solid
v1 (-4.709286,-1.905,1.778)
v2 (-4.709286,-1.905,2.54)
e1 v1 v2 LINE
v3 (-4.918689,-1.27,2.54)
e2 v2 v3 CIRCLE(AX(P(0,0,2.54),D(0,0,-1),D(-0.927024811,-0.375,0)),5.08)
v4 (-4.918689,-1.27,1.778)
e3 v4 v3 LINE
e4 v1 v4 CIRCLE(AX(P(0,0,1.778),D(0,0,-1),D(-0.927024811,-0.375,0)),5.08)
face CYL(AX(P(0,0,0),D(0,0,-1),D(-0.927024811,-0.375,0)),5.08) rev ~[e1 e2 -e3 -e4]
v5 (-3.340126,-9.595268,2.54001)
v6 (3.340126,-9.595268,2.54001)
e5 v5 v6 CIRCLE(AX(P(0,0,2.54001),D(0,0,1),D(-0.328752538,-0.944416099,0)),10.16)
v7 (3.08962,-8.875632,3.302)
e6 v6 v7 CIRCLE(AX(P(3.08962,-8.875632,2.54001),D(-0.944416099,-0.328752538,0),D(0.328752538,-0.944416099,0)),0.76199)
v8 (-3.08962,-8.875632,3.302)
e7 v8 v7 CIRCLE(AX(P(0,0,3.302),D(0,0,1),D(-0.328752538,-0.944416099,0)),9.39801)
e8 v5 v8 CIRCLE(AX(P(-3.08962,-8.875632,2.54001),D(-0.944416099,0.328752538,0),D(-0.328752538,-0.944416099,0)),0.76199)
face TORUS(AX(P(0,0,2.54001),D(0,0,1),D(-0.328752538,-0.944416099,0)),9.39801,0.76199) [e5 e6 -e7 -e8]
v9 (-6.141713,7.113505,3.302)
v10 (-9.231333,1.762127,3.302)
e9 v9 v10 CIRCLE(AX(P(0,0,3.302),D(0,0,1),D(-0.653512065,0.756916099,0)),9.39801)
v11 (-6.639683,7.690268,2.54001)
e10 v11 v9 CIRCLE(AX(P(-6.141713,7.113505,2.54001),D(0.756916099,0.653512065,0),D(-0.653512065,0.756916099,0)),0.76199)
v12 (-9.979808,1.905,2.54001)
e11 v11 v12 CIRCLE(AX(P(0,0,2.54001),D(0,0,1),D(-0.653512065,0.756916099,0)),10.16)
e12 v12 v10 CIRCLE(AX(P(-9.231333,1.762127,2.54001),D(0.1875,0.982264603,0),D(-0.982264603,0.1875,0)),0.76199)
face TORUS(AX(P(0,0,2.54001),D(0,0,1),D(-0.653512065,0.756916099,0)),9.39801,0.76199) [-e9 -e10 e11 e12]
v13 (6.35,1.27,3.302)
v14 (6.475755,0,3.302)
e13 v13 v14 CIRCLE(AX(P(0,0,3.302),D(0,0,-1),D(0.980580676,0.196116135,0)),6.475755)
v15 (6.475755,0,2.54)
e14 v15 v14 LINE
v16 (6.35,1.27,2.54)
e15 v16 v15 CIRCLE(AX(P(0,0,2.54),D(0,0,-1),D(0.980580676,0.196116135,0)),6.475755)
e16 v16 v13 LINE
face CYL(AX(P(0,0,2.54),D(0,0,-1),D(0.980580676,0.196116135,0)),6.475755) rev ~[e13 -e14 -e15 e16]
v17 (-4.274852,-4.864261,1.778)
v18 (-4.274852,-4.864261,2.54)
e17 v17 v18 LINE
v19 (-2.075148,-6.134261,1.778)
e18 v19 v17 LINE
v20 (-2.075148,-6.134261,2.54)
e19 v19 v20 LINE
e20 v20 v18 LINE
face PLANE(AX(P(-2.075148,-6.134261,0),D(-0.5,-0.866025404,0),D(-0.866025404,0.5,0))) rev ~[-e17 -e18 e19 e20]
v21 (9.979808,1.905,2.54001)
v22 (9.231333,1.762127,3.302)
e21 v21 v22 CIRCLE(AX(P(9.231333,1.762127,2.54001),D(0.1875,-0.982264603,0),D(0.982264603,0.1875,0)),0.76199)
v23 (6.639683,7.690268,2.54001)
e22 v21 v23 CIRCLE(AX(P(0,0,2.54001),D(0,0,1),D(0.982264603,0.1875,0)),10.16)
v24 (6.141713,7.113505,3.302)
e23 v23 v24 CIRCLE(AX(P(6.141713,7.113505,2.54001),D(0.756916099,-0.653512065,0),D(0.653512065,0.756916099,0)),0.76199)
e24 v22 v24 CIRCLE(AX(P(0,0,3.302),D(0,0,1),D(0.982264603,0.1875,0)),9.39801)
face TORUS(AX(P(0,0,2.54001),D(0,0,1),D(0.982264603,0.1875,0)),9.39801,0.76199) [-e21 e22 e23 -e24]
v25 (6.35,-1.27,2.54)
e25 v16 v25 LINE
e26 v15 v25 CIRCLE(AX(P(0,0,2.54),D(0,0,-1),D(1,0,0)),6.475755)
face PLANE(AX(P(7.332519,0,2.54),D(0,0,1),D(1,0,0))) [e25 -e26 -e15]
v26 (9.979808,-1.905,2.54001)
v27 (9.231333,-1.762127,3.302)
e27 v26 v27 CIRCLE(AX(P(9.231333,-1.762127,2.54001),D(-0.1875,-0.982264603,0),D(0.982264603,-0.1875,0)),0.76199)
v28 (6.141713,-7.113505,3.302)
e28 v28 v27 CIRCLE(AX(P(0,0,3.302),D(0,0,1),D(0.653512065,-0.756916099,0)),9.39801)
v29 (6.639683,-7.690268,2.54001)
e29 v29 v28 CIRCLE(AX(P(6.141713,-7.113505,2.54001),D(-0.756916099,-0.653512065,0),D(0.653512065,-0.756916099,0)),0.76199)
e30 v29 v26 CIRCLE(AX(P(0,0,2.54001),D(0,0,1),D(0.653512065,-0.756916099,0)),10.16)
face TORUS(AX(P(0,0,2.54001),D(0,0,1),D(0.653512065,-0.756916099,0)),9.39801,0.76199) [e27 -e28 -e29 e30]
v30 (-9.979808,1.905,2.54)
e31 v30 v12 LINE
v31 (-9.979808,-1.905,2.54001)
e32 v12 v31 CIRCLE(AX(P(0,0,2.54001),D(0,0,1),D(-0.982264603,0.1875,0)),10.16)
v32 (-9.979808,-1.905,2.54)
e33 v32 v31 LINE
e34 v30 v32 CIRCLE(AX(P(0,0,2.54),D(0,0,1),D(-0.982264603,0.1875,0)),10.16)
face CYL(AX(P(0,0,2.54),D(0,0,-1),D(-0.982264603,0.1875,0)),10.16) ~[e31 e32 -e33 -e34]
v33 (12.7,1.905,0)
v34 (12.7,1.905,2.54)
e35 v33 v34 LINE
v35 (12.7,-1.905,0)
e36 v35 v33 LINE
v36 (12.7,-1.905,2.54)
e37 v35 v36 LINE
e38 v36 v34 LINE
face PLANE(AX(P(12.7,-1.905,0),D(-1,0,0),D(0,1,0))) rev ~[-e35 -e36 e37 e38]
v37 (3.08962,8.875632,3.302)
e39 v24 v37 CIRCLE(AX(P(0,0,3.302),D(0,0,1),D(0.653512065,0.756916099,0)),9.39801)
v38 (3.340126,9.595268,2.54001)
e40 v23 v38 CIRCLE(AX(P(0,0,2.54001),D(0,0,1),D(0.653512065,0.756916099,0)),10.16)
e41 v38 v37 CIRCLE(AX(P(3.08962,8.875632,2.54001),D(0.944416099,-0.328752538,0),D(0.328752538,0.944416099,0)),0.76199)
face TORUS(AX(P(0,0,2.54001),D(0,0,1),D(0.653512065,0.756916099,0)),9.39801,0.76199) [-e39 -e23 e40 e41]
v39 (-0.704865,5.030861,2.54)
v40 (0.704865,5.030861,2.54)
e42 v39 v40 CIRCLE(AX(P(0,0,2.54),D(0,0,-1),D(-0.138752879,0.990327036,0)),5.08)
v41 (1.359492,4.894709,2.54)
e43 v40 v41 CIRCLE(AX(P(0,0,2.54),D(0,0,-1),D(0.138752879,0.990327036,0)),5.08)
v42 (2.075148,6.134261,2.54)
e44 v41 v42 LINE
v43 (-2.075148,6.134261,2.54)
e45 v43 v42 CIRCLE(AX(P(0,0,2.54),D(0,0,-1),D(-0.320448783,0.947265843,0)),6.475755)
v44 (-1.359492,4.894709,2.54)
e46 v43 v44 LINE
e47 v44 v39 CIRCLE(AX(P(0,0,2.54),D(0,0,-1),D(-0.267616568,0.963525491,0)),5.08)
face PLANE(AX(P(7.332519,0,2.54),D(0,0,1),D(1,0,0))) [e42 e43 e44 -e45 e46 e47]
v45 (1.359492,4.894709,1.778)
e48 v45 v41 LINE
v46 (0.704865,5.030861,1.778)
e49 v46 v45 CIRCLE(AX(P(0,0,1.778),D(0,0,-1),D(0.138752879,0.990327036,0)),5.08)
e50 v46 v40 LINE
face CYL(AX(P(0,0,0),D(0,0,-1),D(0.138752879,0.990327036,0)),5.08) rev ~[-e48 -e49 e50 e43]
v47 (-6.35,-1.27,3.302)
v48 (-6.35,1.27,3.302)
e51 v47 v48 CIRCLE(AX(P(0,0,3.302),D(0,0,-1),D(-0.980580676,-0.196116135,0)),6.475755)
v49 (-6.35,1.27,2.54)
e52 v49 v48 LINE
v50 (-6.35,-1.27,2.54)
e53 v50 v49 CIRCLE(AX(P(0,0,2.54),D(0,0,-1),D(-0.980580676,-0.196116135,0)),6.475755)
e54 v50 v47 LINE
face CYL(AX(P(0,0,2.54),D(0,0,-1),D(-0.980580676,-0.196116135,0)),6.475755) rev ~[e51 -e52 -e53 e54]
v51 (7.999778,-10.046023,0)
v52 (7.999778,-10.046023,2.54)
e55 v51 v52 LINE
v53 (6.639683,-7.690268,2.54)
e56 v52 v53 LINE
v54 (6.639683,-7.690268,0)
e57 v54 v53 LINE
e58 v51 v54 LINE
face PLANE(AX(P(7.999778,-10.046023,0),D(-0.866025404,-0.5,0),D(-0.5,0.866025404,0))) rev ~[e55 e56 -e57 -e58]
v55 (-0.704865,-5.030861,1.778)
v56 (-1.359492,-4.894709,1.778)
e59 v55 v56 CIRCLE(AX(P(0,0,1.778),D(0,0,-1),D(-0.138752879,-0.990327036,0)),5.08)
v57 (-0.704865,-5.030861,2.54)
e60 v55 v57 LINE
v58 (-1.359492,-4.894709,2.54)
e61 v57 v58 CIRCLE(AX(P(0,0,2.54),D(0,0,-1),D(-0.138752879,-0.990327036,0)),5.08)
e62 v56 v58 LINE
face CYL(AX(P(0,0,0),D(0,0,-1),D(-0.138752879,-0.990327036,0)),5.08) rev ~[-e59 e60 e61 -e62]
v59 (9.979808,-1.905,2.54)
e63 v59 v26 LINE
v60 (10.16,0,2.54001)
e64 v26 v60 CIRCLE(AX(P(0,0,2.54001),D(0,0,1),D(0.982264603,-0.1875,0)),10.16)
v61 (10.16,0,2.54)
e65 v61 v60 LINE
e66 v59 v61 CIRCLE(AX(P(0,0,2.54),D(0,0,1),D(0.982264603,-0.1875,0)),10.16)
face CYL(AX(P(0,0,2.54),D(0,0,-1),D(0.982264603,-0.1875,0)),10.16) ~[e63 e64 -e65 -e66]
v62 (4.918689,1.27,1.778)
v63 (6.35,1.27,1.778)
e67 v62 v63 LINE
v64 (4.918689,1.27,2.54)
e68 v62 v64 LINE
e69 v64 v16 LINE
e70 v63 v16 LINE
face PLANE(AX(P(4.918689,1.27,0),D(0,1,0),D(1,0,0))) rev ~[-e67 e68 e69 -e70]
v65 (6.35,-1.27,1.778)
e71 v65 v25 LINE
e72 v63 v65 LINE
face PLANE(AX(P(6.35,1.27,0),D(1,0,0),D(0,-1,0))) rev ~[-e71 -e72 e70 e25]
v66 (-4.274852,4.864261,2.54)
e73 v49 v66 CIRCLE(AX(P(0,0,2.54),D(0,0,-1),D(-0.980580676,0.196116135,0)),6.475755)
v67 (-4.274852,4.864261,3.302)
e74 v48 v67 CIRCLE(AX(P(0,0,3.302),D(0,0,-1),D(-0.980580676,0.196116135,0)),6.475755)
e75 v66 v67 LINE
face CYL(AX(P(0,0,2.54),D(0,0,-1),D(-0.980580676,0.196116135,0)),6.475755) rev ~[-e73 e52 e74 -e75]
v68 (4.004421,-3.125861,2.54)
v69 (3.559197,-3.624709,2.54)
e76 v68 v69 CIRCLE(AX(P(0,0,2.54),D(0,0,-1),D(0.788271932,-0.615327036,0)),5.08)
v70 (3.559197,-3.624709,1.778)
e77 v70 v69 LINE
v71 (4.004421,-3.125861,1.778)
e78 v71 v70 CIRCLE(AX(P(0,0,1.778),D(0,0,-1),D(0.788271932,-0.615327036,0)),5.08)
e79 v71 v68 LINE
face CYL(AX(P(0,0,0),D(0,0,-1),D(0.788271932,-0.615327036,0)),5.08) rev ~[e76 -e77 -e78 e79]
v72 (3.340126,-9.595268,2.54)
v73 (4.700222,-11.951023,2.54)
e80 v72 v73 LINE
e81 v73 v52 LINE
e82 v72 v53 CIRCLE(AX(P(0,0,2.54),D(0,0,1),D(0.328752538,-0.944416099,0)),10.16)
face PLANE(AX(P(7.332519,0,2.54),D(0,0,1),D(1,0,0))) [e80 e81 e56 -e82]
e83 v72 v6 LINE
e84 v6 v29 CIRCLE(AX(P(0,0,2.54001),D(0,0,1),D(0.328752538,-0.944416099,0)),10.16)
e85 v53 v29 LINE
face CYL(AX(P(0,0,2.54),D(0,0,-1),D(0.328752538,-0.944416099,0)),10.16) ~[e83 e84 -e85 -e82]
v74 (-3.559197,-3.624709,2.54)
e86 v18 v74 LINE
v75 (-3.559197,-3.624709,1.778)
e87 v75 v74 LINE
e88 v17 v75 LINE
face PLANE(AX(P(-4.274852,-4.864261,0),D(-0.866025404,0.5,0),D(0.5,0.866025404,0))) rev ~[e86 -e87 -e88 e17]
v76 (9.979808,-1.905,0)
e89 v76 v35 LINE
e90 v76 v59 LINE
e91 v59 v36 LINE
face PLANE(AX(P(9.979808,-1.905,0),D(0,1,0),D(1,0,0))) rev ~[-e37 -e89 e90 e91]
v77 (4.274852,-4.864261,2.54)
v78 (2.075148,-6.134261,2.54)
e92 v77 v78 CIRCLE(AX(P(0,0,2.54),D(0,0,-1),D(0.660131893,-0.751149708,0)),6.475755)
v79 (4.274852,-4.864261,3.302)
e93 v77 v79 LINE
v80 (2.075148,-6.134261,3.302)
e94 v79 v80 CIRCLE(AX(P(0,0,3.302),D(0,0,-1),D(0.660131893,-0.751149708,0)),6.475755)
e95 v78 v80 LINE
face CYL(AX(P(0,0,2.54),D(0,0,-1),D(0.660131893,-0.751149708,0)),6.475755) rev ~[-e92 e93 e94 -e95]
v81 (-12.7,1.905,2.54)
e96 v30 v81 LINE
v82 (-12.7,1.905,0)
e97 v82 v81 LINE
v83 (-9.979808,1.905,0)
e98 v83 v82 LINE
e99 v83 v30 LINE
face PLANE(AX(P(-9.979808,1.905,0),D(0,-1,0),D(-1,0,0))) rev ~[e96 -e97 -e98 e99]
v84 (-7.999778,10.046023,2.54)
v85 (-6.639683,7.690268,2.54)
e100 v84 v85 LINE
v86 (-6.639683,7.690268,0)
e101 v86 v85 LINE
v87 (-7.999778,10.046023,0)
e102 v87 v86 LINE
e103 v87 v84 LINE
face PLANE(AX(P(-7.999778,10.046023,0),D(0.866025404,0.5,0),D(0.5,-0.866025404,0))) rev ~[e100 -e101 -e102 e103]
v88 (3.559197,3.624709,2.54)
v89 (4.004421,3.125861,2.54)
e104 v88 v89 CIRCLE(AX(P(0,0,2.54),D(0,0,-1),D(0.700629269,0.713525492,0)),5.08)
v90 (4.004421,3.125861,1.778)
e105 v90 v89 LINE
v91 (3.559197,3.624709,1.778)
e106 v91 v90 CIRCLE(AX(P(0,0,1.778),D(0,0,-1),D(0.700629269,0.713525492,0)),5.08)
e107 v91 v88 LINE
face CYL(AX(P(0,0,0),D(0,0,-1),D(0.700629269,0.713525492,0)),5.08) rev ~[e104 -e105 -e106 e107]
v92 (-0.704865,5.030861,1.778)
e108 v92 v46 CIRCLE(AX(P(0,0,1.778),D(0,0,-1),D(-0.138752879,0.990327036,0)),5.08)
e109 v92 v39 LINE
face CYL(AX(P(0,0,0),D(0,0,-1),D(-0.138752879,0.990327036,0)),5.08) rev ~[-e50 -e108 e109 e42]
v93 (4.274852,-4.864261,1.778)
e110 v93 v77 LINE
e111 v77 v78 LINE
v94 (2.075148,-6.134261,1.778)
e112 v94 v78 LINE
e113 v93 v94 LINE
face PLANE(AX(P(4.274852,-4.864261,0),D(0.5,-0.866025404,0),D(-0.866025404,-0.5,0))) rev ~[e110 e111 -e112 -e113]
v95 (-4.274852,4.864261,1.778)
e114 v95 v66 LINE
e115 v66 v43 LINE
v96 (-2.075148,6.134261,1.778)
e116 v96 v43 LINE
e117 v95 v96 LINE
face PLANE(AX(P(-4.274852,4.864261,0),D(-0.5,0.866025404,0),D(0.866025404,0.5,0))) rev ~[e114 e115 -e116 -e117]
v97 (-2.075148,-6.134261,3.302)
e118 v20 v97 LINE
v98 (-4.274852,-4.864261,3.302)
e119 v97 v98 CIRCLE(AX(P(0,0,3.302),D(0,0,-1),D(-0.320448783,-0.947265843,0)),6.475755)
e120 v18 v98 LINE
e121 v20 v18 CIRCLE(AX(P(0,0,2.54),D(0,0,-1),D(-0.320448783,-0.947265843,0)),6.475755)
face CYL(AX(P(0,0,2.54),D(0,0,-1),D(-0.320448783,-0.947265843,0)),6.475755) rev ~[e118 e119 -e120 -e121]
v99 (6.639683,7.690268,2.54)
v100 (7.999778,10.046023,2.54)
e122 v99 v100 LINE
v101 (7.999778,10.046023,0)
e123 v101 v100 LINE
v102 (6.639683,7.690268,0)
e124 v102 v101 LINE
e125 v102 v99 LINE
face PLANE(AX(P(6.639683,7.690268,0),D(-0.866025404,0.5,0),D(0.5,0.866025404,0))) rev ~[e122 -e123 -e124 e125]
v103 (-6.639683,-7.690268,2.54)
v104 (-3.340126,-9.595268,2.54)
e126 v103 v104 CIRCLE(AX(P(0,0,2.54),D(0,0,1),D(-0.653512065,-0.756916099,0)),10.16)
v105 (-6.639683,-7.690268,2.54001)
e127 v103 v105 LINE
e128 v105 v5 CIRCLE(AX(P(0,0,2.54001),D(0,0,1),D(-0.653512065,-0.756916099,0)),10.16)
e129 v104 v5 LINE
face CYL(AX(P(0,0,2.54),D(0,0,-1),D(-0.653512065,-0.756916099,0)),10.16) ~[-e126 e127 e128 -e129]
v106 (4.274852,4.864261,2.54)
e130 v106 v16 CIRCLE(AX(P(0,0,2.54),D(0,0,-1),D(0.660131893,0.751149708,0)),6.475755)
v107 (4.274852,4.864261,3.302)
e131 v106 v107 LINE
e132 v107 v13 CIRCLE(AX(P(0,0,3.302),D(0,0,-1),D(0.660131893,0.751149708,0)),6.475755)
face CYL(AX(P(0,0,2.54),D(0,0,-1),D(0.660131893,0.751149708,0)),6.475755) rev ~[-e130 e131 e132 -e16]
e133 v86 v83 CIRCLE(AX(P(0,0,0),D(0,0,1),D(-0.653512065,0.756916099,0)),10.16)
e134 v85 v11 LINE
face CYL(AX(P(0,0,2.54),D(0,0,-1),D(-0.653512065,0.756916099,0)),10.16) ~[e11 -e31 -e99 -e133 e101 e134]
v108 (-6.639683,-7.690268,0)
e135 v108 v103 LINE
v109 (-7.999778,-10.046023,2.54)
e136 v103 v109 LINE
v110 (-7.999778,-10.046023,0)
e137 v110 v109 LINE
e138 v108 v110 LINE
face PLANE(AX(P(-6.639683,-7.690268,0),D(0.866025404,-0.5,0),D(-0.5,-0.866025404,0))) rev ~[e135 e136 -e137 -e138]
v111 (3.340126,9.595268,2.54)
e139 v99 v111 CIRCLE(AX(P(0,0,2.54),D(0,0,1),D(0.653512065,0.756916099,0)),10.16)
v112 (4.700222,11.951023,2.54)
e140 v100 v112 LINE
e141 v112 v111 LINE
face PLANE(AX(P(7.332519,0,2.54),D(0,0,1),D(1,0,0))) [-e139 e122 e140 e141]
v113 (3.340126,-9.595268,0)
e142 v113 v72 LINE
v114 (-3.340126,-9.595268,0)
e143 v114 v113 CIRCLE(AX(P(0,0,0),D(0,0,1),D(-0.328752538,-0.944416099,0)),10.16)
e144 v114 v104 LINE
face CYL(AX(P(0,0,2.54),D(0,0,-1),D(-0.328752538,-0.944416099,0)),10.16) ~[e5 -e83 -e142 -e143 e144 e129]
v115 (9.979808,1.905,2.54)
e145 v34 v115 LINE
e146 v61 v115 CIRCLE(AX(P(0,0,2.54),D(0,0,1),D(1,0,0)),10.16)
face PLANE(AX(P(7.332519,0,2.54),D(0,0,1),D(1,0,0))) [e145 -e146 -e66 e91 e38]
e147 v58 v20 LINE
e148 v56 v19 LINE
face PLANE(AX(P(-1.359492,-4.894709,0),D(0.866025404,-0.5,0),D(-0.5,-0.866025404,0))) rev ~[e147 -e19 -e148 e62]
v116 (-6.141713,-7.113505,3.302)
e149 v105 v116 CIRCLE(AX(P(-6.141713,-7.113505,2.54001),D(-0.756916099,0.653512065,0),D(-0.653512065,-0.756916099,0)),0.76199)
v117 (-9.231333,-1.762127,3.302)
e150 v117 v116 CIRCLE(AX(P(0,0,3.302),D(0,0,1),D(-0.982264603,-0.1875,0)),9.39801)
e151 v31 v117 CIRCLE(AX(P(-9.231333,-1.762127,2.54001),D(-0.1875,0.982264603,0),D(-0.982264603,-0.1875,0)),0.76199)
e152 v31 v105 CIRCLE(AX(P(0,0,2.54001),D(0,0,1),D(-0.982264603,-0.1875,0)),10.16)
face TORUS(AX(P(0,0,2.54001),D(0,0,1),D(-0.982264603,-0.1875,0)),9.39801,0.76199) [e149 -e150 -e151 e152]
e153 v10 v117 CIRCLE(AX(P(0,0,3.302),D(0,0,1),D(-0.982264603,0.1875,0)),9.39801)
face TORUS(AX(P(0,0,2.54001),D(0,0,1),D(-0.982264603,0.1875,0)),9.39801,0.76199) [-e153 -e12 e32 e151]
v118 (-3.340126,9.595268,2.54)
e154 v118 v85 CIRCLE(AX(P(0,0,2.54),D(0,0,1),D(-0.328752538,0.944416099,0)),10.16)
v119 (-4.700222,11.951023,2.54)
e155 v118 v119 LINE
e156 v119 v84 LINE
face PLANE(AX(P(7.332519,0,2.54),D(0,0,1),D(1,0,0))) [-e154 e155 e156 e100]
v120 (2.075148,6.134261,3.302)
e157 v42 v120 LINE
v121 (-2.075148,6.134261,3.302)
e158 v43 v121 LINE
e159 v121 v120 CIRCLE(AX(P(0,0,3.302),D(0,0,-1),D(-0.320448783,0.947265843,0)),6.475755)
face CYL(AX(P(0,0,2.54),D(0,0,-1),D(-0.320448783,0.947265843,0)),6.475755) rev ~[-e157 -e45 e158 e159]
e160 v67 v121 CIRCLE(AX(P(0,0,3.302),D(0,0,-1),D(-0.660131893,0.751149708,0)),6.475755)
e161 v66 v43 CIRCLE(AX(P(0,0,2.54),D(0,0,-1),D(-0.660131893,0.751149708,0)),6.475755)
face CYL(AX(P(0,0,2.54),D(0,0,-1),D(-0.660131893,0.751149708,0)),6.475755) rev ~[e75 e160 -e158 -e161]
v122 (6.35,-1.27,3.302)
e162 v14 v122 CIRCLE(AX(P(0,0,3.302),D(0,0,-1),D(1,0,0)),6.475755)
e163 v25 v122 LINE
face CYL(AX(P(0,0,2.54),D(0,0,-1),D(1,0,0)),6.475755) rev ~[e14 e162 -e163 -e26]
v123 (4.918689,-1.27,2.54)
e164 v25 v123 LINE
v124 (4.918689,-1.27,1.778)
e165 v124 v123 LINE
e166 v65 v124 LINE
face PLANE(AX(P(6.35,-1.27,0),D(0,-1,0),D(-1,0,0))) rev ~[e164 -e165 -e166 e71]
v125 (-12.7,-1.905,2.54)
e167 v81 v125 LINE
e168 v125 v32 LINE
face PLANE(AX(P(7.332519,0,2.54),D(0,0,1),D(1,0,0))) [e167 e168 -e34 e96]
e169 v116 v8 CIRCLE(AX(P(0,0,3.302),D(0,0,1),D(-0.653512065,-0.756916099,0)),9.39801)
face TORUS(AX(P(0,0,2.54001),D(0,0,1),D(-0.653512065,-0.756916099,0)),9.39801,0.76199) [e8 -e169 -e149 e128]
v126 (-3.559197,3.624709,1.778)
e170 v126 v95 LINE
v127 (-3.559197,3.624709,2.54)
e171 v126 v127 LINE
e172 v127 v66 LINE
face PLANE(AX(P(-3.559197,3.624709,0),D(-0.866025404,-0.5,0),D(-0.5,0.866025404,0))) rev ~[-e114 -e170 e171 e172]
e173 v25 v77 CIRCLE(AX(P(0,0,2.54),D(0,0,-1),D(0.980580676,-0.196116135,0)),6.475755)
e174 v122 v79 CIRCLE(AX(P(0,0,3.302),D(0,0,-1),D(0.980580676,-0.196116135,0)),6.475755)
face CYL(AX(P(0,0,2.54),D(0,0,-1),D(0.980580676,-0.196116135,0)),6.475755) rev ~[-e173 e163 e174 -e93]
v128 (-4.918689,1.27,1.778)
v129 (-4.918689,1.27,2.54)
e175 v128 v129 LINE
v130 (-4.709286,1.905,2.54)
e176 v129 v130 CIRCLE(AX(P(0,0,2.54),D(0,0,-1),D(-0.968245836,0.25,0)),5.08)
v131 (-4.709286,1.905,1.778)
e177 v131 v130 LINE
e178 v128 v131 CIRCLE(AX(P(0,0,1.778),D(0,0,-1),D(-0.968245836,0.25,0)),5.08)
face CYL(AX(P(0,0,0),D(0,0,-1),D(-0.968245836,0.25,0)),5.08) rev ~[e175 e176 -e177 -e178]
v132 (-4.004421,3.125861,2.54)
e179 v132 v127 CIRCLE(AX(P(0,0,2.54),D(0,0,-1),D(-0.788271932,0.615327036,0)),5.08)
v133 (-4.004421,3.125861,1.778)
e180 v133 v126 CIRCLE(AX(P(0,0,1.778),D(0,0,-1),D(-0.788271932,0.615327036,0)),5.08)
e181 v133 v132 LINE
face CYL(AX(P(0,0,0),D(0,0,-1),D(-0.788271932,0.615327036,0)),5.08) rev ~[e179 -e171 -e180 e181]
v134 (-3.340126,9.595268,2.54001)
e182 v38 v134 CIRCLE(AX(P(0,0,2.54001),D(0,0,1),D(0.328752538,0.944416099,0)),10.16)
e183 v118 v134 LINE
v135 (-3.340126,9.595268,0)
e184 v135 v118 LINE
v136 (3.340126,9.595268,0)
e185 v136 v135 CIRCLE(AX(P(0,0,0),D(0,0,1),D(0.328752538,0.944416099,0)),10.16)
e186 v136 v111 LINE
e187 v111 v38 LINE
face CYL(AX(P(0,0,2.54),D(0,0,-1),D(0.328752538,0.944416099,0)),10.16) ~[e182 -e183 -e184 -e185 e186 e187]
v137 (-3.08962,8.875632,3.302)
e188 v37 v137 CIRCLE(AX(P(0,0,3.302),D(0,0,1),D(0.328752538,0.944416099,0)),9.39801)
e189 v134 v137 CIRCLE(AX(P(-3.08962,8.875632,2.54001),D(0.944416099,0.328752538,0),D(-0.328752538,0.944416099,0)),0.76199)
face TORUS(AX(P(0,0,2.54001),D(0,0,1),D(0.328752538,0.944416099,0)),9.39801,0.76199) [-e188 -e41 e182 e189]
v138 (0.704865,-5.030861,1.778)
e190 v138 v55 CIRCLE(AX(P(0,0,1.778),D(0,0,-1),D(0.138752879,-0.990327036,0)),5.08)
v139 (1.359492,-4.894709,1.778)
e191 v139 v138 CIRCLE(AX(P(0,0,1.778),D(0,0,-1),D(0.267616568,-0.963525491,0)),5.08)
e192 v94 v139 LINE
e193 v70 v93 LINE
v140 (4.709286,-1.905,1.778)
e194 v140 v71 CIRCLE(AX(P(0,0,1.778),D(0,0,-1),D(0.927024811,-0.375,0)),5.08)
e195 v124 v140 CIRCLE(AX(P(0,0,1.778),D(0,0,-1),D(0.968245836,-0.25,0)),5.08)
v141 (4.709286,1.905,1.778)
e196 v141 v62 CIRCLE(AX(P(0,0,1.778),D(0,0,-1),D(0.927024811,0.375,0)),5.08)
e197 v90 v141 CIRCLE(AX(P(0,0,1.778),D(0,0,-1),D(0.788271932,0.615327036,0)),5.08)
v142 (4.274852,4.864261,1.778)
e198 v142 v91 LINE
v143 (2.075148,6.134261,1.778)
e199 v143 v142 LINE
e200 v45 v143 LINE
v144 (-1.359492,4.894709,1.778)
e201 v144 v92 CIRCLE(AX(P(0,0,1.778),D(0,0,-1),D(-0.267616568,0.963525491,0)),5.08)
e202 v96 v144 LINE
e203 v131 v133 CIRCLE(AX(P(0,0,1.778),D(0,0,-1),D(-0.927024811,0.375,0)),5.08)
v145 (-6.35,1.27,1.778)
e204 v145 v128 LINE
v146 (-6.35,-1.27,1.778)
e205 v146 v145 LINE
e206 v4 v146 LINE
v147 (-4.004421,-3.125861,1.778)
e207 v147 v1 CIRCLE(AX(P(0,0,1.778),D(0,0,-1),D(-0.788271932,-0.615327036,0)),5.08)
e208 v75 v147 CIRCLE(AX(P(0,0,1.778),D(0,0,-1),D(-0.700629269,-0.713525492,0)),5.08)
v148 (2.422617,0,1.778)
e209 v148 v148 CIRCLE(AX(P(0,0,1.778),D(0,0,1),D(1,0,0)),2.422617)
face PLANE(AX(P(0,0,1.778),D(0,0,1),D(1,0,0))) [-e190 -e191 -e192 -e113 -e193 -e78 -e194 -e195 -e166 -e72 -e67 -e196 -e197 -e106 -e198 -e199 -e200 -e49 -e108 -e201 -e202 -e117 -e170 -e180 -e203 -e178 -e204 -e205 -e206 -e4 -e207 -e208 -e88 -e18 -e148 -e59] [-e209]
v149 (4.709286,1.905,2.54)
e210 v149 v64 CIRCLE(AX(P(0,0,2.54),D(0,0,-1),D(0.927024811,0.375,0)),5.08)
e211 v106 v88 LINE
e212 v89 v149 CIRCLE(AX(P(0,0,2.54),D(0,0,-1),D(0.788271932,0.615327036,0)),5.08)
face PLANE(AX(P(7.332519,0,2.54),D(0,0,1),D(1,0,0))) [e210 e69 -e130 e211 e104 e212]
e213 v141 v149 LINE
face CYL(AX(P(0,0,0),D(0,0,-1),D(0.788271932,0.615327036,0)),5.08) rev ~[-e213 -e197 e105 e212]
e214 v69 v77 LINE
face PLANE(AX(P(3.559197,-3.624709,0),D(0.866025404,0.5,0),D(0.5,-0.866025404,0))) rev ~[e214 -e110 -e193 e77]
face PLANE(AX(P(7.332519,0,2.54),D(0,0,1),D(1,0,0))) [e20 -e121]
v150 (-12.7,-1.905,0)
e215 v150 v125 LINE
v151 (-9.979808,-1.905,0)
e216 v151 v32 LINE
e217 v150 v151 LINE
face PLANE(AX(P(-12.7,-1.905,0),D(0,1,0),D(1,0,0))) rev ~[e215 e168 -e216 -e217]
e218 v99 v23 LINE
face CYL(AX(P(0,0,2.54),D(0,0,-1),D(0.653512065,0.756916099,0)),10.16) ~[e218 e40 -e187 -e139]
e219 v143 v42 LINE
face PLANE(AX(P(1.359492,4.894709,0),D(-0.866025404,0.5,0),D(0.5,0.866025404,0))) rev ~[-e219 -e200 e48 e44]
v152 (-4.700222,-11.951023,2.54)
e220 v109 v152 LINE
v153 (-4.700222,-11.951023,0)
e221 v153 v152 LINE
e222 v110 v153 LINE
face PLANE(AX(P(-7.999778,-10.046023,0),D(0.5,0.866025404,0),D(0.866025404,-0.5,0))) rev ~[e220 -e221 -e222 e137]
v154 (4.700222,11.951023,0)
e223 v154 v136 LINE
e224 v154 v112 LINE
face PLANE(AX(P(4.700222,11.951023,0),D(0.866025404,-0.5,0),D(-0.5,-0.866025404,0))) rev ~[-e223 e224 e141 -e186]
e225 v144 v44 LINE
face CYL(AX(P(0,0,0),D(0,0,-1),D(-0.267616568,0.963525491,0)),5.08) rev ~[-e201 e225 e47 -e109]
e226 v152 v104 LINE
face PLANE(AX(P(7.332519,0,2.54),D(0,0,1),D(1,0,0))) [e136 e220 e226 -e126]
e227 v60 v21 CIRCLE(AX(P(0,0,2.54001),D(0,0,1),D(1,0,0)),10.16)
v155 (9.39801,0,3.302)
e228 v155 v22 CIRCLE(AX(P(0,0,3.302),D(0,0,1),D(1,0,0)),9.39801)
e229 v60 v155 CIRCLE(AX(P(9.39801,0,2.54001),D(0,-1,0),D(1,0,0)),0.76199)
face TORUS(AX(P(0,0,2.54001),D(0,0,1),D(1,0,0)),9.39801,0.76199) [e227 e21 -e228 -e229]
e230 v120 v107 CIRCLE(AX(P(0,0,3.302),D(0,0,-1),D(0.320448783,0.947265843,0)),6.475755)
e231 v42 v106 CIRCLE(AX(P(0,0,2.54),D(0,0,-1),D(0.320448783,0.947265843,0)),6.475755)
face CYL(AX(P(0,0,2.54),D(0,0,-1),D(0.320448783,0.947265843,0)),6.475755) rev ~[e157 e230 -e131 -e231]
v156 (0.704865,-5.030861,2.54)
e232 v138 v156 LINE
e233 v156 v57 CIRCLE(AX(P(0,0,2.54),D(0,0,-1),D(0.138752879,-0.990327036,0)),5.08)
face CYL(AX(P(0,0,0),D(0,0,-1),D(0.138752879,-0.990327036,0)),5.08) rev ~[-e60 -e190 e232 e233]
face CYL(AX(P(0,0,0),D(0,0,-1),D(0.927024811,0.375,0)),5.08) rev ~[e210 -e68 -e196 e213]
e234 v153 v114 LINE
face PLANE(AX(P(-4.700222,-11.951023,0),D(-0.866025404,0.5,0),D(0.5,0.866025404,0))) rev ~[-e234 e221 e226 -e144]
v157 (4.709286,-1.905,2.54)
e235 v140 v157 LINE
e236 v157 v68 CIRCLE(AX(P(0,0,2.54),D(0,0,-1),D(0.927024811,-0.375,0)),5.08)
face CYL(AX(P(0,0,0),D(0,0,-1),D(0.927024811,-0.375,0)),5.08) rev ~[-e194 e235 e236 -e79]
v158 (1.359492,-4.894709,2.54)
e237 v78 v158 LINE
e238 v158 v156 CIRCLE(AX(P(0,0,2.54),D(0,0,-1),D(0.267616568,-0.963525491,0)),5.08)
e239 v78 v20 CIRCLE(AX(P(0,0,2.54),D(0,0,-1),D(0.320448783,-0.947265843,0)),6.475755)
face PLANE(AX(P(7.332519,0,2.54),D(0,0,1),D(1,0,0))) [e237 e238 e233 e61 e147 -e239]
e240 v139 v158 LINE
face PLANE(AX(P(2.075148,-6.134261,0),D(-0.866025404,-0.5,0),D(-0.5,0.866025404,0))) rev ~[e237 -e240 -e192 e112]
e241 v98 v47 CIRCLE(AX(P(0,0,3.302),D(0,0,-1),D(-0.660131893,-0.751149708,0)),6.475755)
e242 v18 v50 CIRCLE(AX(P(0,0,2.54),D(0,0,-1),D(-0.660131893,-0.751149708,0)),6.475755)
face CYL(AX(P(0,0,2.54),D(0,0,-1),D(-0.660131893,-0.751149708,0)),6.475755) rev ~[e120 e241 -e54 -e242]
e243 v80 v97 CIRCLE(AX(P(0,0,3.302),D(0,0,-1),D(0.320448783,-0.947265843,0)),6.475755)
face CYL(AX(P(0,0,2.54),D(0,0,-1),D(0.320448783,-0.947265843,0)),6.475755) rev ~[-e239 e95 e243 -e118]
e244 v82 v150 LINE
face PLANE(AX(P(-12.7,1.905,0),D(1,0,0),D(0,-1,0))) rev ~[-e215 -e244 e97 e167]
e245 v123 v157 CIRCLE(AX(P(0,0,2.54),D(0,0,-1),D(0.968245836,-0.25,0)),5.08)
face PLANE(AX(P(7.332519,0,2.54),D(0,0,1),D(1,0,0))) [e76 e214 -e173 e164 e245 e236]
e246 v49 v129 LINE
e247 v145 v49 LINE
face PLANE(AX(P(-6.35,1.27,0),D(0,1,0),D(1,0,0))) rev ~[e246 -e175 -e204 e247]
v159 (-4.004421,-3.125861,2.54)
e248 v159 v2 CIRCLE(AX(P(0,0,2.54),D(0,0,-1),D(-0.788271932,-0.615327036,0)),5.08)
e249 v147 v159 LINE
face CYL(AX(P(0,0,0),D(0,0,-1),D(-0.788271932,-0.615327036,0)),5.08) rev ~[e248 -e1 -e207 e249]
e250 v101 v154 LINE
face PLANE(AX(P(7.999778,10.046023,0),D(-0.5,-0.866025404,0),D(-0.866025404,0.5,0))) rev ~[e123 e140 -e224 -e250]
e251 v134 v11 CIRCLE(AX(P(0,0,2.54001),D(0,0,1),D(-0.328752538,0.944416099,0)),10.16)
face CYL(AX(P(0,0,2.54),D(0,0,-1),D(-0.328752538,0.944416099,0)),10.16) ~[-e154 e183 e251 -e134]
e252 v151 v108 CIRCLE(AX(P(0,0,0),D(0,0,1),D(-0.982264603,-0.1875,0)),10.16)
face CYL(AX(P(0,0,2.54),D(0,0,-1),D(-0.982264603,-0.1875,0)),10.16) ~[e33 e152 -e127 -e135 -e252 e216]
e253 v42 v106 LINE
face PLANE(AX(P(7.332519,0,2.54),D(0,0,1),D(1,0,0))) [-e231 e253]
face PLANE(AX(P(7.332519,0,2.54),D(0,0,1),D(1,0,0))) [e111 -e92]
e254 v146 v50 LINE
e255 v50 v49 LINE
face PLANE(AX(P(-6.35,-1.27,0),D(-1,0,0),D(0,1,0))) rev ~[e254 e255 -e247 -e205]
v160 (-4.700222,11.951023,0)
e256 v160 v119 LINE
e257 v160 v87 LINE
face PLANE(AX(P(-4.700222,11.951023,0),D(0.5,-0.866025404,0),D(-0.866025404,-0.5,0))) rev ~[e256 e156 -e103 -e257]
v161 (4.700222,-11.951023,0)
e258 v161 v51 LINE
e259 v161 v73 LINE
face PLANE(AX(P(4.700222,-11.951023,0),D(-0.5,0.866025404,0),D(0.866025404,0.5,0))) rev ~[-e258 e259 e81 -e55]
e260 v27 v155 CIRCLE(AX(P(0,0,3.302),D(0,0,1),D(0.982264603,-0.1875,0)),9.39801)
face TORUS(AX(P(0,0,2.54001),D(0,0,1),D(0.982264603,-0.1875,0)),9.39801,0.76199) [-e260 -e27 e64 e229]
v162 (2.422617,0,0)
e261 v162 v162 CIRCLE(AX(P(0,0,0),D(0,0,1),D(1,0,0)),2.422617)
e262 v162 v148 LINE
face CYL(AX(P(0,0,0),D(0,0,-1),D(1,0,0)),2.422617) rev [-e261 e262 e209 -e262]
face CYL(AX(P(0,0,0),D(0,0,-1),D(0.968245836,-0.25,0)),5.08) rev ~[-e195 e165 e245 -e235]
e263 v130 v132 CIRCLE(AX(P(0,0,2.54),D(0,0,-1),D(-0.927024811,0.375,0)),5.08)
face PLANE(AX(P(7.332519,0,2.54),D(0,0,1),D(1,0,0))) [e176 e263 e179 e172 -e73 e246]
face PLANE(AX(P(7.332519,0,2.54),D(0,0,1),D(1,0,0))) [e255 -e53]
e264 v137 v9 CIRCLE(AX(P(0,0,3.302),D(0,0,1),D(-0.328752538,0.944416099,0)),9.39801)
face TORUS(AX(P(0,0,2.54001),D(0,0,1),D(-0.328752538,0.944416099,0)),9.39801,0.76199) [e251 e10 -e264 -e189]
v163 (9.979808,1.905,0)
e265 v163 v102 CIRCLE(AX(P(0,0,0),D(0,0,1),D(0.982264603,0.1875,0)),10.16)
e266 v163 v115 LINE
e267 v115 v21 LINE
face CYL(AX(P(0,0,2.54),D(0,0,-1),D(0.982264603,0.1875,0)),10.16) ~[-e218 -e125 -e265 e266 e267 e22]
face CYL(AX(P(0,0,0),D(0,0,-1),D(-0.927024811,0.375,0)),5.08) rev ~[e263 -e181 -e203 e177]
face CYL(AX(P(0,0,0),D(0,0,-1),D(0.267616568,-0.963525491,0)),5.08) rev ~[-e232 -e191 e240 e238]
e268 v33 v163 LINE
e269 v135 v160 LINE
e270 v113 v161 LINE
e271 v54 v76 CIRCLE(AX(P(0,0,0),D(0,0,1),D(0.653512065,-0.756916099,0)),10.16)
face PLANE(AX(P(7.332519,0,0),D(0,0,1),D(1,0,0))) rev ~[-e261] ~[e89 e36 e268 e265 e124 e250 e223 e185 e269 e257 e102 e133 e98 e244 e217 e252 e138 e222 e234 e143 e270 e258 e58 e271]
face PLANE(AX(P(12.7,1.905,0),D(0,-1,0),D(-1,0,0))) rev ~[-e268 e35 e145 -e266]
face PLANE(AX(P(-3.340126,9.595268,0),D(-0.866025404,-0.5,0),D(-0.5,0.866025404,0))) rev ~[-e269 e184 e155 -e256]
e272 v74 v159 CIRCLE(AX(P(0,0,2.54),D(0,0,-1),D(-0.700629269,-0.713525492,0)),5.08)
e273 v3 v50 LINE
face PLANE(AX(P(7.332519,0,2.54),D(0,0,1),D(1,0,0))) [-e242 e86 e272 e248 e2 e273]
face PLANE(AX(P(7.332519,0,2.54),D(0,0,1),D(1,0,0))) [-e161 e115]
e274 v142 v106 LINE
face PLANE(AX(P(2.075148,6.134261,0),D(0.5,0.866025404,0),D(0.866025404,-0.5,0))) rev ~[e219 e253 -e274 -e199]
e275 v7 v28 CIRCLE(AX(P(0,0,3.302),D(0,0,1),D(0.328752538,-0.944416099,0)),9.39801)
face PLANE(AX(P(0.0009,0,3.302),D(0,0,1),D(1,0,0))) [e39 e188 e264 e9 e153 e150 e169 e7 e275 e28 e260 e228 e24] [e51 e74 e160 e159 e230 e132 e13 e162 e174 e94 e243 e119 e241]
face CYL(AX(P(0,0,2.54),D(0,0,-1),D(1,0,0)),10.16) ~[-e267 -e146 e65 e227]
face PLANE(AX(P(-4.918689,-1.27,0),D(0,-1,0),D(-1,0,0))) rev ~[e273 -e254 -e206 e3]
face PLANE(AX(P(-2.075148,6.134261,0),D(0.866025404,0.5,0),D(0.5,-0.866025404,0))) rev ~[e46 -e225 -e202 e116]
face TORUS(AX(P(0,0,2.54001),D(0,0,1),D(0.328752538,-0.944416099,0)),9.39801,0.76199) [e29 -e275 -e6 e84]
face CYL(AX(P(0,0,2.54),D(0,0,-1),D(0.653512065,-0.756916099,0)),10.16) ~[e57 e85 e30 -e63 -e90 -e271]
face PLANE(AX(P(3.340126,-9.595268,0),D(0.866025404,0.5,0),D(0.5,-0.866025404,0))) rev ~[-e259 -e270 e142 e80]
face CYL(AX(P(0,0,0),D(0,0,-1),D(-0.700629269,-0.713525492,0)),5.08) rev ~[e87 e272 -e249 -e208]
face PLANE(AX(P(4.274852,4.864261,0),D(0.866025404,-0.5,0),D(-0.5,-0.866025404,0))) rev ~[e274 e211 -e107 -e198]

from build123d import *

# Parameters (mm, degrees)
F2_DEPTH = 2.54
F3_R     = 7.6884407039
F3_R_2   = 2.4226171542
F4_DEPTH = 1.778
F6_DEPTH = 0.762
F7_R     = 0.76199


# Not quite as in the source:
# - a fillet or chamfer is up to 0.001 mm smaller than in the source, because OpenCascade refuses the exact size


with BuildPart() as f2:
    # F1 (on Top) → F2 (new body)
    with BuildSketch(Plane.XY):
        with BuildLine():
            ThreePointArc((9.9798083649, -1.905), (10.1148517781, -0.9567515385), (10.16, 0))
            ThreePointArc((10.16, 0), (10.1148517781, 0.9567515385), (9.9798083649, 1.905))
            Line((9.9798083649, 1.905), (4.7092860393, 1.905))
            ThreePointArc((4.7092860393, 1.905), (4.8244462237, 1.5909489729), (4.9186888497, 1.27))
            Line((4.9186888497, 1.27), (6.35, 1.27))
            Line((6.35, 1.27), (6.35, -1.27))
            Line((6.35, -1.27), (4.9186888497, -1.27))
            ThreePointArc((4.9186888497, -1.27), (4.8244462237, -1.5909489729), (4.7092860393, -1.905))
            Line((4.7092860393, -1.905), (9.9798083649, -1.905))
        make_face()
        with BuildLine():
            ThreePointArc((9.9798083649, 1.905), (10.1148517781, 0.9567515385), (10.16, 0))
            ThreePointArc((10.16, 0), (10.1148517781, -0.9567515385), (9.9798083649, -1.905))
            Line((9.9798083649, -1.905), (12.7, -1.905))
            Line((12.7, -1.905), (12.7, 1.905))
            Line((12.7, 1.905), (9.9798083649, 1.905))
        make_face()
        with BuildLine():
            Line((4.7092860393, 1.905), (9.9798083649, 1.905))
            ThreePointArc((9.9798083649, 1.905), (8.7988181024, 5.08), (6.6396825767, 7.6902675689))
            Line((6.6396825767, 7.6902675689), (4.0044214139, 3.1258613437))
            ThreePointArc((4.0044214139, 3.1258613437), (4.3994090512, 2.54), (4.7092860393, 1.905))
        make_face()
        with BuildLine():
            ThreePointArc((6.6396825767, -7.6902675689), (8.7988181024, -5.08), (9.9798083649, -1.905))
            Line((9.9798083649, -1.905), (4.7092860393, -1.905))
            ThreePointArc((4.7092860393, -1.905), (4.3994090512, -2.54), (4.0044214139, -3.1258613437))
            Line((4.0044214139, -3.1258613437), (6.6396825767, -7.6902675689))
        make_face()
        with BuildLine():
            Line((4.0044214139, 3.1258613437), (6.6396825767, 7.6902675689))
            ThreePointArc((6.6396825767, 7.6902675689), (5.08, 8.7988181024), (3.3401257882, 9.5952675689))
            Line((3.3401257882, 9.5952675689), (0.7048646254, 5.0308613437))
            ThreePointArc((0.7048646254, 5.0308613437), (1.0344208852, 4.9735674754), (1.359492162, 4.8947094971))
            Line((1.359492162, 4.8947094971), (2.0751477372, 6.134261314))
            Line((2.0751477372, 6.134261314), (4.2748522628, 4.864261314))
            Line((4.2748522628, 4.864261314), (3.5591966876, 3.6247094971))
            ThreePointArc((3.5591966876, 3.6247094971), (3.7900253385, 3.3826185025), (4.0044214139, 3.1258613437))
        make_face()
        with BuildLine():
            ThreePointArc((3.3401257882, 9.5952675689), (5.08, 8.7988181024), (6.6396825767, 7.6902675689))
            Line((6.6396825767, 7.6902675689), (7.9997783942, 10.0460226281))
            Line((7.9997783942, 10.0460226281), (4.7002216058, 11.9510226281))
            Line((4.7002216058, 11.9510226281), (3.3401257882, 9.5952675689))
        make_face()
        with BuildLine():
            Line((7.9997783942, -10.0460226281), (6.6396825767, -7.6902675689))
            ThreePointArc((6.6396825767, -7.6902675689), (5.08, -8.7988181024), (3.3401257882, -9.5952675689))
            Line((3.3401257882, -9.5952675689), (4.7002216058, -11.9510226281))
            Line((4.7002216058, -11.9510226281), (7.9997783942, -10.0460226281))
        make_face()
        with BuildLine():
            ThreePointArc((3.3401257882, -9.5952675689), (5.08, -8.7988181024), (6.6396825767, -7.6902675689))
            Line((6.6396825767, -7.6902675689), (4.0044214139, -3.1258613437))
            ThreePointArc((4.0044214139, -3.1258613437), (3.7900253385, -3.3826185025), (3.5591966876, -3.6247094971))
            Line((3.5591966876, -3.6247094971), (4.2748522628, -4.864261314))
            Line((4.2748522628, -4.864261314), (2.0751477372, -6.134261314))
            Line((2.0751477372, -6.134261314), (1.359492162, -4.8947094971))
            ThreePointArc((1.359492162, -4.8947094971), (1.0344208852, -4.9735674754), (0.7048646254, -5.0308613437))
            Line((0.7048646254, -5.0308613437), (3.3401257882, -9.5952675689))
        make_face()
        with BuildLine():
            Line((0.7048646254, 5.0308613437), (3.3401257882, 9.5952675689))
            ThreePointArc((3.3401257882, 9.5952675689), (0, 10.16), (-3.3401257882, 9.5952675689))
            Line((-3.3401257882, 9.5952675689), (-0.7048646254, 5.0308613437))
            ThreePointArc((-0.7048646254, 5.0308613437), (0, 5.08), (0.7048646254, 5.0308613437))
        make_face()
        with BuildLine():
            ThreePointArc((-3.3401257882, -9.5952675689), (0, -10.16), (3.3401257882, -9.5952675689))
            Line((3.3401257882, -9.5952675689), (0.7048646254, -5.0308613437))
            ThreePointArc((0.7048646254, -5.0308613437), (0, -5.08), (-0.7048646254, -5.0308613437))
            Line((-0.7048646254, -5.0308613437), (-3.3401257882, -9.5952675689))
        make_face()
        with BuildLine():
            Line((-0.7048646254, 5.0308613437), (-3.3401257882, 9.5952675689))
            ThreePointArc((-3.3401257882, 9.5952675689), (-5.08, 8.7988181024), (-6.6396825767, 7.6902675689))
            Line((-6.6396825767, 7.6902675689), (-4.0044214139, 3.1258613437))
            ThreePointArc((-4.0044214139, 3.1258613437), (-3.7900253385, 3.3826185025), (-3.5591966876, 3.6247094971))
            Line((-3.5591966876, 3.6247094971), (-4.2748522628, 4.864261314))
            Line((-4.2748522628, 4.864261314), (-2.0751477372, 6.134261314))
            Line((-2.0751477372, 6.134261314), (-1.359492162, 4.8947094971))
            ThreePointArc((-1.359492162, 4.8947094971), (-1.0344208852, 4.9735674754), (-0.7048646254, 5.0308613437))
        make_face()
        with BuildLine():
            ThreePointArc((-6.6396825767, 7.6902675689), (-5.08, 8.7988181024), (-3.3401257882, 9.5952675689))
            Line((-3.3401257882, 9.5952675689), (-4.7002216058, 11.9510226281))
            Line((-4.7002216058, 11.9510226281), (-7.9997783942, 10.0460226281))
            Line((-7.9997783942, 10.0460226281), (-6.6396825767, 7.6902675689))
        make_face()
        with BuildLine():
            Line((-4.7002216058, -11.9510226281), (-3.3401257882, -9.5952675689))
            ThreePointArc((-3.3401257882, -9.5952675689), (-5.08, -8.7988181024), (-6.6396825767, -7.6902675689))
            Line((-6.6396825767, -7.6902675689), (-7.9997783942, -10.0460226281))
            Line((-7.9997783942, -10.0460226281), (-4.7002216058, -11.9510226281))
        make_face()
        with BuildLine():
            ThreePointArc((-6.6396825767, -7.6902675689), (-5.08, -8.7988181024), (-3.3401257882, -9.5952675689))
            Line((-3.3401257882, -9.5952675689), (-0.7048646254, -5.0308613437))
            ThreePointArc((-0.7048646254, -5.0308613437), (-1.0344208852, -4.9735674754), (-1.359492162, -4.8947094971))
            Line((-1.359492162, -4.8947094971), (-2.0751477372, -6.134261314))
            Line((-2.0751477372, -6.134261314), (-4.2748522628, -4.864261314))
            Line((-4.2748522628, -4.864261314), (-3.5591966876, -3.6247094971))
            ThreePointArc((-3.5591966876, -3.6247094971), (-3.7900253385, -3.3826185025), (-4.0044214139, -3.1258613437))
            Line((-4.0044214139, -3.1258613437), (-6.6396825767, -7.6902675689))
        make_face()
        with BuildLine():
            Line((-4.0044214139, 3.1258613437), (-6.6396825767, 7.6902675689))
            ThreePointArc((-6.6396825767, 7.6902675689), (-8.7988181024, 5.08), (-9.9798083649, 1.905))
            Line((-9.9798083649, 1.905), (-4.7092860393, 1.905))
            ThreePointArc((-4.7092860393, 1.905), (-4.3994090512, 2.54), (-4.0044214139, 3.1258613437))
        make_face()
        with BuildLine():
            ThreePointArc((-9.9798083649, -1.905), (-8.7988181024, -5.08), (-6.6396825767, -7.6902675689))
            Line((-6.6396825767, -7.6902675689), (-4.0044214139, -3.1258613437))
            ThreePointArc((-4.0044214139, -3.1258613437), (-4.3994090512, -2.54), (-4.7092860393, -1.905))
            Line((-4.7092860393, -1.905), (-9.9798083649, -1.905))
        make_face()
        with BuildLine():
            Line((-4.7092860393, 1.905), (-9.9798083649, 1.905))
            ThreePointArc((-9.9798083649, 1.905), (-10.16, 0), (-9.9798083649, -1.905))
            Line((-9.9798083649, -1.905), (-4.7092860393, -1.905))
            ThreePointArc((-4.7092860393, -1.905), (-4.8244462237, -1.5909489729), (-4.9186888497, -1.27))
            Line((-4.9186888497, -1.27), (-6.35, -1.27))
            Line((-6.35, -1.27), (-6.35, 1.27))
            Line((-6.35, 1.27), (-4.9186888497, 1.27))
            ThreePointArc((-4.9186888497, 1.27), (-4.8244462237, 1.5909489729), (-4.7092860393, 1.905))
        make_face()
        with BuildLine():
            ThreePointArc((-9.9798083649, -1.905), (-10.16, 0), (-9.9798083649, 1.905))
            Line((-9.9798083649, 1.905), (-12.7, 1.905))
            Line((-12.7, 1.905), (-12.7, -1.905))
            Line((-12.7, -1.905), (-9.9798083649, -1.905))
        make_face()
    extrude(amount=F2_DEPTH)

    # F3 (on face) → F4 (join)
    with BuildSketch(Plane.XY):
        Circle(F3_R)
        Circle(F3_R_2, mode=Mode.SUBTRACT)
    extrude(amount=F4_DEPTH)

    # F5 (on face) → F6 (join)
    with BuildSketch(Plane.XY.offset(2.54)):
        with BuildLine():
            ThreePointArc((9.9798083649, -1.905), (10.1148517781, -0.9567515385), (10.16, 0))
            ThreePointArc((10.16, 0), (10.1148517781, 0.9567515385), (9.9798083649, 1.905))
            ThreePointArc((9.9798083649, 1.905), (8.7988181024, 5.08), (6.6396825767, 7.6902675689))
            ThreePointArc((6.6396825767, 7.6902675689), (5.08, 8.7988181024), (3.3401257882, 9.5952675689))
            ThreePointArc((3.3401257882, 9.5952675689), (0, 10.16), (-3.3401257882, 9.5952675689))
            ThreePointArc((-3.3401257882, 9.5952675689), (-5.08, 8.7988181024), (-6.6396825767, 7.6902675689))
            ThreePointArc((-6.6396825767, 7.6902675689), (-8.7988181024, 5.08), (-9.9798083649, 1.905))
            ThreePointArc((-9.9798083649, 1.905), (-10.16, 0), (-9.9798083649, -1.905))
            ThreePointArc((-9.9798083649, -1.905), (-8.7988181024, -5.08), (-6.6396825767, -7.6902675689))
            ThreePointArc((-6.6396825767, -7.6902675689), (-5.08, -8.7988181024), (-3.3401257882, -9.5952675689))
            ThreePointArc((-3.3401257882, -9.5952675689), (0, -10.16), (3.3401257882, -9.5952675689))
            ThreePointArc((3.3401257882, -9.5952675689), (5.08, -8.7988181024), (6.6396825767, -7.6902675689))
            ThreePointArc((6.6396825767, -7.6902675689), (8.7988181024, -5.08), (9.9798083649, -1.905))
        make_face()
        with BuildLine():
            ThreePointArc((6.35, 1.27), (6.4442393992, 0.6381054508), (6.4757547823, 0))
            ThreePointArc((6.4757547823, 0), (6.4442393992, -0.6381054508), (6.35, -1.27))
            ThreePointArc((6.35, -1.27), (5.6081681501, -3.2378773911), (4.2748522628, -4.864261314))
            ThreePointArc((4.2748522628, -4.864261314), (3.2378773911, -5.6081681501), (2.0751477372, -6.134261314))
            ThreePointArc((2.0751477372, -6.134261314), (0, -6.4757547823), (-2.0751477372, -6.134261314))
            ThreePointArc((-2.0751477372, -6.134261314), (-3.2378773911, -5.6081681501), (-4.2748522628, -4.864261314))
            ThreePointArc((-4.2748522628, -4.864261314), (-5.6081681501, -3.2378773911), (-6.35, -1.27))
            ThreePointArc((-6.35, -1.27), (-6.4757547823, 0), (-6.35, 1.27))
            ThreePointArc((-6.35, 1.27), (-5.6081681501, 3.2378773911), (-4.2748522628, 4.864261314))
            ThreePointArc((-4.2748522628, 4.864261314), (-3.2378773911, 5.6081681501), (-2.0751477372, 6.134261314))
            ThreePointArc((-2.0751477372, 6.134261314), (0, 6.4757547823), (2.0751477372, 6.134261314))
            ThreePointArc((2.0751477372, 6.134261314), (3.2378773911, 5.6081681501), (4.2748522628, 4.864261314))
            ThreePointArc((4.2748522628, 4.864261314), (5.6081681501, 3.2378773911), (6.35, 1.27))
        make_face(mode=Mode.SUBTRACT)
    extrude(amount=F6_DEPTH)

    # F7 (radius 0.762 in the source; OpenCascade refuses exactly that, so slightly less here)
    f7_edges = [f2.edges().sort_by_distance(p)[0] for p in [
        (9.979808, 1.905, 3.302),
    ]]
    fillet(f7_edges, radius=F7_R)


solid = f2.part
